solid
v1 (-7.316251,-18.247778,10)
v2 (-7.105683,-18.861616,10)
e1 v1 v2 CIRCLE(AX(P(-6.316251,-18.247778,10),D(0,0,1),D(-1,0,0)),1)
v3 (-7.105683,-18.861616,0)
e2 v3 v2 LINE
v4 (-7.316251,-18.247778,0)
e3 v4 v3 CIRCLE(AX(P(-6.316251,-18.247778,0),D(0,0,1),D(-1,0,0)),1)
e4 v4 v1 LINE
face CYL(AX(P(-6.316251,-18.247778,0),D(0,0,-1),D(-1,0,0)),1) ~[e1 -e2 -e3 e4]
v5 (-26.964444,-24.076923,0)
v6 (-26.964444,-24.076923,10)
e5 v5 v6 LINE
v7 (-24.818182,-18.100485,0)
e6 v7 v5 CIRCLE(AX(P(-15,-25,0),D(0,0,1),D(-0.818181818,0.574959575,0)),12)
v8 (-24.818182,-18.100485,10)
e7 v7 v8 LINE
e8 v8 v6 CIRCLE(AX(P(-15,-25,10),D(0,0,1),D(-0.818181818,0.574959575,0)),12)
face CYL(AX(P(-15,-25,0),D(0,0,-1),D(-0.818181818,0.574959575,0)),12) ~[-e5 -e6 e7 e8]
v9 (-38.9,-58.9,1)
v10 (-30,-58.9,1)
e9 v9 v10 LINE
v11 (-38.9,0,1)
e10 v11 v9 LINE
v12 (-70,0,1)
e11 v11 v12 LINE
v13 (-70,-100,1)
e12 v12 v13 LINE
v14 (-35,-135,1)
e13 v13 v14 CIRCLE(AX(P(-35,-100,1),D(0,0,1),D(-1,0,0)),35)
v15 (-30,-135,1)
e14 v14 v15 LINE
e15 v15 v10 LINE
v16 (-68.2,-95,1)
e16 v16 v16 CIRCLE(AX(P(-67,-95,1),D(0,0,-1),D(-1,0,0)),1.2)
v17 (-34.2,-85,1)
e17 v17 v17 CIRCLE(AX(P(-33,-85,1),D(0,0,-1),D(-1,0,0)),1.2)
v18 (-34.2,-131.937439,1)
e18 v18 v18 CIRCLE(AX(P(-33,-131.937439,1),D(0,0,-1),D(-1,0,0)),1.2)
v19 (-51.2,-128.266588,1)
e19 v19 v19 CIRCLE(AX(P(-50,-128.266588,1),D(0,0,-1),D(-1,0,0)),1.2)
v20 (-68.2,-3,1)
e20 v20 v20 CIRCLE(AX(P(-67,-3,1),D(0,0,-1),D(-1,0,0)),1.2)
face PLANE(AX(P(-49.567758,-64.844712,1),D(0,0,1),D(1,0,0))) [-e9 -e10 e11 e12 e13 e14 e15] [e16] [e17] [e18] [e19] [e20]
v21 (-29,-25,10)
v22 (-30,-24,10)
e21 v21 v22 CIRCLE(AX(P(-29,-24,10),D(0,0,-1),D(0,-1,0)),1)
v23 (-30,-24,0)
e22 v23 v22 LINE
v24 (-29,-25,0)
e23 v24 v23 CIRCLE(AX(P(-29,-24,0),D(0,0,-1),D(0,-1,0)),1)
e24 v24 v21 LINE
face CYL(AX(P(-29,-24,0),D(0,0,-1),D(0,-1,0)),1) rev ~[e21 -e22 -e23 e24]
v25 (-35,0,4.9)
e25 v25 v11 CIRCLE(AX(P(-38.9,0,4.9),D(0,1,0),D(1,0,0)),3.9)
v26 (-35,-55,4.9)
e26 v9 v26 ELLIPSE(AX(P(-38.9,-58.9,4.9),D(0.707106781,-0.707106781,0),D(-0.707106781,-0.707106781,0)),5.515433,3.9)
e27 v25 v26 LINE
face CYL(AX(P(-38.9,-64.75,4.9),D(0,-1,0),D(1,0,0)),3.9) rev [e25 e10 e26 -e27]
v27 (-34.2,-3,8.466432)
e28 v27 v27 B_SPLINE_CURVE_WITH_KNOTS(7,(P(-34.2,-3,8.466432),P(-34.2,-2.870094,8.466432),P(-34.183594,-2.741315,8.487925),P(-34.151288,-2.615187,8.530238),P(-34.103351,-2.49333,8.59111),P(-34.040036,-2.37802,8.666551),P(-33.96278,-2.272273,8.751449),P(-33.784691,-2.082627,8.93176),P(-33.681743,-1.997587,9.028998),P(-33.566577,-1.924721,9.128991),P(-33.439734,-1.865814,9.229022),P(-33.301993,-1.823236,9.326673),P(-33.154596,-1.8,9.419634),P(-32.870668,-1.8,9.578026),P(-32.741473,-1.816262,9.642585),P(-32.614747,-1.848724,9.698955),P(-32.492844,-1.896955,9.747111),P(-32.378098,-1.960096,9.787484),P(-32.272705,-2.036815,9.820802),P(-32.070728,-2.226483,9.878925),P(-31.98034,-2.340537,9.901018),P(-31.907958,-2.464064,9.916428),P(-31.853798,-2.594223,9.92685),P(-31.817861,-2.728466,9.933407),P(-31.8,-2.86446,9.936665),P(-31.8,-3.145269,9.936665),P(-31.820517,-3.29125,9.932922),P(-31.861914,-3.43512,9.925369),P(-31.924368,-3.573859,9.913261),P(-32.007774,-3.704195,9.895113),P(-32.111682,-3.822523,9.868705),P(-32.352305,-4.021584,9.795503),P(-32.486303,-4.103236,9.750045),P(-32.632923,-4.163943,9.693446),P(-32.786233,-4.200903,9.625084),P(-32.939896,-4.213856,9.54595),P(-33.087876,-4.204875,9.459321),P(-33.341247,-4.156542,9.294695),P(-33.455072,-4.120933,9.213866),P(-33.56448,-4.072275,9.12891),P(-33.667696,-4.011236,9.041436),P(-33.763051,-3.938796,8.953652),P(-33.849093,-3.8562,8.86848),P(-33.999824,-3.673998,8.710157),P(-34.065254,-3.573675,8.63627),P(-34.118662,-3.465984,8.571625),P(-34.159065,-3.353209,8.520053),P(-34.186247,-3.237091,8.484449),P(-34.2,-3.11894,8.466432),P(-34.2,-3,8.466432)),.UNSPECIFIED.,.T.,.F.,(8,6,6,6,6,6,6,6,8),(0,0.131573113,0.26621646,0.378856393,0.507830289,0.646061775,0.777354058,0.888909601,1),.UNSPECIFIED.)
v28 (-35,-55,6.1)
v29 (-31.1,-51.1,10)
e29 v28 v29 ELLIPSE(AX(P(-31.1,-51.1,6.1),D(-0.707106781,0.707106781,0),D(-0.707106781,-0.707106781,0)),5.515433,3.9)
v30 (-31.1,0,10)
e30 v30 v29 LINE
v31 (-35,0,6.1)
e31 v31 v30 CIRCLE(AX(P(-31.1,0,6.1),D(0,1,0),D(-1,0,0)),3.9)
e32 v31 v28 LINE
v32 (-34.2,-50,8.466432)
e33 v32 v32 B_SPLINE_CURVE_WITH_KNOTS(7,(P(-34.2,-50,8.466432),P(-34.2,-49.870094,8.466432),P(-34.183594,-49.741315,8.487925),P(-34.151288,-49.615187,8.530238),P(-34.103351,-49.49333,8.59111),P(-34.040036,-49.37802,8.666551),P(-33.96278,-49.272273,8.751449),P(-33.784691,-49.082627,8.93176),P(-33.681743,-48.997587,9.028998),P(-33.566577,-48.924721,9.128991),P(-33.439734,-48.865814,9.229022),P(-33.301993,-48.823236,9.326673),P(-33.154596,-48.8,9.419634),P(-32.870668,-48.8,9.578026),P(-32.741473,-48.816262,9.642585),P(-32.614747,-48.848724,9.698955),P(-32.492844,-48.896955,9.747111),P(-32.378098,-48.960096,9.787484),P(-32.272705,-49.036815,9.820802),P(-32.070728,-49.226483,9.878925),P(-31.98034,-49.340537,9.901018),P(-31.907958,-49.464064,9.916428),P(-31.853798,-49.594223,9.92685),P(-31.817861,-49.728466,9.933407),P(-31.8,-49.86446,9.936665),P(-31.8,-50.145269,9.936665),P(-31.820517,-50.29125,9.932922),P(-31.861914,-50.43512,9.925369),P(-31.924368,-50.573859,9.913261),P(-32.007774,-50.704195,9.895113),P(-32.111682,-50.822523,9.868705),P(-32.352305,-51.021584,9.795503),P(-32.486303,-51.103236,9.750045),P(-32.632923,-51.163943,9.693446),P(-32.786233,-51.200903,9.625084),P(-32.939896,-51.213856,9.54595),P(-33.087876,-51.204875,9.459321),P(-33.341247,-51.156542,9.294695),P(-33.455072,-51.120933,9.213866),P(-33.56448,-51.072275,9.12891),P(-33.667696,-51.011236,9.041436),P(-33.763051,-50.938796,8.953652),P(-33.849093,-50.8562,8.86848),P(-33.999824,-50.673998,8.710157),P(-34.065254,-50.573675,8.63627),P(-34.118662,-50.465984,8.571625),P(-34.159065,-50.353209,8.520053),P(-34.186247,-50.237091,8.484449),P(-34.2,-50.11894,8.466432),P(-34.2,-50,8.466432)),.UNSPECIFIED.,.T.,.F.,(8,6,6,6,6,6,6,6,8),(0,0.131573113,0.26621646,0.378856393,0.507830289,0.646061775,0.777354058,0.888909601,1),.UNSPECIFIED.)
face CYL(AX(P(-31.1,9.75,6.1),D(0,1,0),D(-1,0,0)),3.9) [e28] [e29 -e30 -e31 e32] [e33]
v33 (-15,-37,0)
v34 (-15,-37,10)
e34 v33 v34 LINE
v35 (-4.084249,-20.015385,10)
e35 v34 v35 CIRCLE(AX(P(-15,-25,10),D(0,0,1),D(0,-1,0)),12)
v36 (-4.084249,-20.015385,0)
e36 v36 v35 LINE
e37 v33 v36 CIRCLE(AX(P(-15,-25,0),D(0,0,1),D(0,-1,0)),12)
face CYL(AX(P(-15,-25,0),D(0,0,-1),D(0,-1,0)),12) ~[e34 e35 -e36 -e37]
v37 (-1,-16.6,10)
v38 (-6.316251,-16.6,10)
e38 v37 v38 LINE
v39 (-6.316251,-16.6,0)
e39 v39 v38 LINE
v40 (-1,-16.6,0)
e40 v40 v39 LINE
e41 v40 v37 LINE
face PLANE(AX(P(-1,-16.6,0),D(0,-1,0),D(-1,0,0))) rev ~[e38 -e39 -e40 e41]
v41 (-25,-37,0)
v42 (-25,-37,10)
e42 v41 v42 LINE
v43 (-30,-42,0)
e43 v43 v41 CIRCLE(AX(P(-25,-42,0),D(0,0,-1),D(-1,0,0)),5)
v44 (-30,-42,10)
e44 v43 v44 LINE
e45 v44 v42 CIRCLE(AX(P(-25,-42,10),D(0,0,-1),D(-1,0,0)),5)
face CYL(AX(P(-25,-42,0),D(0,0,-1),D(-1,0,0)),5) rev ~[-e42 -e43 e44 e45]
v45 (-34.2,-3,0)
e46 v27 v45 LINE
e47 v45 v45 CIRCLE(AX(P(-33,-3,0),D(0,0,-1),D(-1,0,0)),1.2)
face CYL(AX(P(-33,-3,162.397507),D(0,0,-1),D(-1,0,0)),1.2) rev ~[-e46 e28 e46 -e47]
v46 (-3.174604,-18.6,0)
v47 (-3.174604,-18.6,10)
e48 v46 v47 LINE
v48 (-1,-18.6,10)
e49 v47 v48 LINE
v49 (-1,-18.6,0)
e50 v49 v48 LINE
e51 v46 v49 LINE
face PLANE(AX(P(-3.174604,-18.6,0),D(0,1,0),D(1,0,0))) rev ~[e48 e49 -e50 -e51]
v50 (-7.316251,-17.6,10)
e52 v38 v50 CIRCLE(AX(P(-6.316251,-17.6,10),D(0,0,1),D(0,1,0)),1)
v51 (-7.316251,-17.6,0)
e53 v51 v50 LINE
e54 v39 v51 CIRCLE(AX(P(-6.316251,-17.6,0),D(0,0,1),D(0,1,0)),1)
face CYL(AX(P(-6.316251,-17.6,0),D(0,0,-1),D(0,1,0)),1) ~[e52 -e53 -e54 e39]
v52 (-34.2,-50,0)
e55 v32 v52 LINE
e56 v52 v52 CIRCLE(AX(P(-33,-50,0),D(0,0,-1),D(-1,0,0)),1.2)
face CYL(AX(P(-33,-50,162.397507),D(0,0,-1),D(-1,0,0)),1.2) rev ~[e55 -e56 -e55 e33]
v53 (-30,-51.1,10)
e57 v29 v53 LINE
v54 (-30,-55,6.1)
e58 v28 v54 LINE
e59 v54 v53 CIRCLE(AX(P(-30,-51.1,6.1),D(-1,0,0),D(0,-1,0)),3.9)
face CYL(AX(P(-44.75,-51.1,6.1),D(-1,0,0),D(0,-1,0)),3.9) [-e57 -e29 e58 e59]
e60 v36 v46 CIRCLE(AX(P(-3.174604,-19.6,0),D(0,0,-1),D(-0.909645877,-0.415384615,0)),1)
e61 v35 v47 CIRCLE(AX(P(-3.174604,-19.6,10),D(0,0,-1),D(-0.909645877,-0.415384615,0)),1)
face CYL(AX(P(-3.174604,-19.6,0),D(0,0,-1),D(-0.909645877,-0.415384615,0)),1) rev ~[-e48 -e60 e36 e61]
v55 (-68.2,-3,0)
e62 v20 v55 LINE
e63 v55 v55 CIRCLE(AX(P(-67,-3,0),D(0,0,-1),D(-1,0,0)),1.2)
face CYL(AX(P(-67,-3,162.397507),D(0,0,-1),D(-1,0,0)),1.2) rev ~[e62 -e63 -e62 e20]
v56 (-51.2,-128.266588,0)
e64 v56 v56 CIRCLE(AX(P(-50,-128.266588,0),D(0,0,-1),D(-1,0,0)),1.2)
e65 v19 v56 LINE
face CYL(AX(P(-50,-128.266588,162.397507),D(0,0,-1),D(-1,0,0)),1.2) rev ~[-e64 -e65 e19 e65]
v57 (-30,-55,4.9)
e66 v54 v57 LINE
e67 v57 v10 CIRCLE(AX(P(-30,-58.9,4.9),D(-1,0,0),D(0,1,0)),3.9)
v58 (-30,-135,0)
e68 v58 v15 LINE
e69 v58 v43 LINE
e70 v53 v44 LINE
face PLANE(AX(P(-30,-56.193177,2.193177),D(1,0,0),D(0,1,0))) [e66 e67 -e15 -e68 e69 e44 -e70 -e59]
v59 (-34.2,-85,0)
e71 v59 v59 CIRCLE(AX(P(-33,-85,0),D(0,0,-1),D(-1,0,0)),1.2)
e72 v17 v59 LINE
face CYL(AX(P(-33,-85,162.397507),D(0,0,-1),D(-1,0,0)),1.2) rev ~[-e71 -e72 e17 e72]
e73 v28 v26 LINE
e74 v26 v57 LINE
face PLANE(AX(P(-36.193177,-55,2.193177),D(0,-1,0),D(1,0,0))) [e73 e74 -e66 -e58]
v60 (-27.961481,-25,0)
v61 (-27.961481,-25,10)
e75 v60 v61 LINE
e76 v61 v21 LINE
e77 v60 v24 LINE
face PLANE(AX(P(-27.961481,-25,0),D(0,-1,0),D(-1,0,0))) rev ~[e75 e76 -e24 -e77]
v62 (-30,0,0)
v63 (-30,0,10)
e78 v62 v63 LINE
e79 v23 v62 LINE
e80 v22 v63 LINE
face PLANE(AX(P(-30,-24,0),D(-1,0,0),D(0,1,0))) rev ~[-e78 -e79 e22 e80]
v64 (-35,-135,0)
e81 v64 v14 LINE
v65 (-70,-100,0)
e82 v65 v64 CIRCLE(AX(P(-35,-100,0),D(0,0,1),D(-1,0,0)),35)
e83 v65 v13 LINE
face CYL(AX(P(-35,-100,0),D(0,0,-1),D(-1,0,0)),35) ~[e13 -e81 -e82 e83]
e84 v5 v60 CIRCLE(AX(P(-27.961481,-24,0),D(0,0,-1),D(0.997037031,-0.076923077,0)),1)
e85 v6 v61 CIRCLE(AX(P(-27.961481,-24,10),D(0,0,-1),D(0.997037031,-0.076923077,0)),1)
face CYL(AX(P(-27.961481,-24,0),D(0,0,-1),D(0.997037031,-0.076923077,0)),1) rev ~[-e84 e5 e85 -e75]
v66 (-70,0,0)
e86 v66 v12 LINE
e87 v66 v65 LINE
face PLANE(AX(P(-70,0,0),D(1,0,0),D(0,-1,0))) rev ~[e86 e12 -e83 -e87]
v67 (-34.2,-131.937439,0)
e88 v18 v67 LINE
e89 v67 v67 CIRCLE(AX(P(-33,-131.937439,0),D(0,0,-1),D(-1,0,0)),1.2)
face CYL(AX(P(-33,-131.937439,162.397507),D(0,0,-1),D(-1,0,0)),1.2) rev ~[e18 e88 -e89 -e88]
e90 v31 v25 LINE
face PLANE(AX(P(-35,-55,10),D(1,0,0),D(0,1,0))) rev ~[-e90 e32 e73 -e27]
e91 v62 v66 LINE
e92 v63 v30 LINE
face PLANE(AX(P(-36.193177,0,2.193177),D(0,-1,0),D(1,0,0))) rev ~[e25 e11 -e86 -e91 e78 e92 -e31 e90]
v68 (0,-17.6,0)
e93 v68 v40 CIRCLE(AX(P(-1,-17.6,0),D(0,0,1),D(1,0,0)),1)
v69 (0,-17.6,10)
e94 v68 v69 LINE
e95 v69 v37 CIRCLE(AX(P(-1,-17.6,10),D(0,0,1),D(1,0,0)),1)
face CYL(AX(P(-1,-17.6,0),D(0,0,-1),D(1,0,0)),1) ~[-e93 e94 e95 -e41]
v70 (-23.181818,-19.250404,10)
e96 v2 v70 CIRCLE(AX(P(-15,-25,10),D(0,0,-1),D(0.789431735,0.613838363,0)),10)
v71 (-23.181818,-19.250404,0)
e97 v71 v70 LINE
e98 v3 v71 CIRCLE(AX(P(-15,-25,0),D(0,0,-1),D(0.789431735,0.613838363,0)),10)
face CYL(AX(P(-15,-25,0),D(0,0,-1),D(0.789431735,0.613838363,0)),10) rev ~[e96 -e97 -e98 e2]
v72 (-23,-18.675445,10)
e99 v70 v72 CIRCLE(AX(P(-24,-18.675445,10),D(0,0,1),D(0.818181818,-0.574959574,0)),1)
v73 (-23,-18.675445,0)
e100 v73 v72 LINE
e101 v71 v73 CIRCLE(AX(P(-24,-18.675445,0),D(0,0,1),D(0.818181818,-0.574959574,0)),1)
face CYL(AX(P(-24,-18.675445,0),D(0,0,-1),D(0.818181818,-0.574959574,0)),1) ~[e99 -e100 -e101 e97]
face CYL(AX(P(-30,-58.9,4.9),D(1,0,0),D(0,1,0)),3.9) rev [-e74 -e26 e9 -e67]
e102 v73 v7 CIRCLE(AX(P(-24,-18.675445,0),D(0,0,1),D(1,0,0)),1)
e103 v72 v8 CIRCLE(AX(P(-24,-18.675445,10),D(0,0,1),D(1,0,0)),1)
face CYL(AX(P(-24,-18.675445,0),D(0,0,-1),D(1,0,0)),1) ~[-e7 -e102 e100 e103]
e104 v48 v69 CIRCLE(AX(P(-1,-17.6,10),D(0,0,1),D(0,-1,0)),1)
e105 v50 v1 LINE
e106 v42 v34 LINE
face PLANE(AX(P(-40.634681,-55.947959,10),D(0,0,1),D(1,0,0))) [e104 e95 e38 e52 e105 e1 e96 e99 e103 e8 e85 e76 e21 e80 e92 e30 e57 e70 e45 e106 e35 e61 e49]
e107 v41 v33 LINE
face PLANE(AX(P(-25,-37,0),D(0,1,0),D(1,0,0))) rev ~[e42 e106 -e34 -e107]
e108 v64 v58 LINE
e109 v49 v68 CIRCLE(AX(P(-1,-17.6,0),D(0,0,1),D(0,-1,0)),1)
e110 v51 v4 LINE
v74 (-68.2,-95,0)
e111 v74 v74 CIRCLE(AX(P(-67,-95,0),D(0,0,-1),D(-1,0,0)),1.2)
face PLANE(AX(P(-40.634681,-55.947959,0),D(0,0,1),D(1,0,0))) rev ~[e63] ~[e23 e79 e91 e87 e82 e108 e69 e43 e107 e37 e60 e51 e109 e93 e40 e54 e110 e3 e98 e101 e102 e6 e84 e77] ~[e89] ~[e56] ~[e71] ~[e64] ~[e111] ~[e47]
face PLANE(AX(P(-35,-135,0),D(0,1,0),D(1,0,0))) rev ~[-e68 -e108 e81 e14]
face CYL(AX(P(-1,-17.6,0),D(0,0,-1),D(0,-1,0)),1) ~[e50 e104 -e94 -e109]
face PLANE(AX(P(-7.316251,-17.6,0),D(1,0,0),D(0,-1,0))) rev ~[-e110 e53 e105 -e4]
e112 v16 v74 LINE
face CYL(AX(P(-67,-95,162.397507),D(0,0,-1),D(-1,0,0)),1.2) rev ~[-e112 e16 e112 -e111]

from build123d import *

# Parameters (mm, degrees)
F1_DEPTH     = 10
F3_DEPTH     = 9
F5_D         = 2.4
F6_T1_DEPTH  = 55
F6_T3_DEPTH  = 5
F6_T9_DEPTH  = 64.75
F6_T13_DEPTH = 14.75
F6_T16_DEPTH = 24.5
F6_T18_DEPTH = 74.5


# Not quite as in the source:
# - a fillet or chamfer that OpenCascade refuses, or shapes differently, is made with other operations: its cross-section is extruded or revolved along the edge and cut away or added
# - a feature names something its author has since deleted; it is built from what else it names


with BuildPart() as f1:
    # F0 (on Top) → F1 (new body)
    with BuildSketch(Plane.XY):
        with BuildLine():
            Line((-30, 0), (-70, 0))
            Line((-70, 0), (-70, -100))
            ThreePointArc((-70, -100), (-59.7487373415, -124.7487373415), (-35, -135))
            Line((-35, -135), (-30, -135))
            Line((-30, -135), (-30, -42))
            ThreePointArc((-30, -42), (-28.5355339059, -38.4644660941), (-25, -37))
            Line((-25, -37), (-15, -37))
            ThreePointArc((-15, -37), (-4.9050660078, -31.4878584828), (-4.0842494776, -20.0153846154))
            ThreePointArc((-4.0842494776, -20.0153846154), (-4.0158481001, -19.0593451264), (-3.1746036007, -18.6))
            Line((-3.1746036007, -18.6), (-1, -18.6))
            ThreePointArc((-1, -18.6), (-0.2928932188, -18.3071067812), (0, -17.6))
            ThreePointArc((0, -17.6), (-0.2928932188, -16.8928932188), (-1, -16.6))
            Line((-1, -16.6), (-6.3162509151, -16.6))
            ThreePointArc((-6.3162509151, -16.6), (-7.0233576963, -16.8928932188), (-7.3162509151, -17.6))
            Line((-7.3162509151, -17.6), (-7.3162509151, -18.2477780079))
            ThreePointArc((-7.3162509151, -18.2477780079), (-7.2621451309, -18.5722531726), (-7.1056826501, -18.8616163708))
            ThreePointArc((-7.1056826501, -18.8616163708), (-14.7582290616, -34.9970769134), (-23.1818181818, -19.2504042542))
            ThreePointArc((-23.1818181818, -19.2504042542), (-23.0465374108, -18.9769560242), (-23, -18.6754446797))
            ThreePointArc((-23, -18.6754446797), (-23.6984886554, -17.7219820904), (-24.8181818182, -18.1004851051))
            ThreePointArc((-24.8181818182, -18.1004851051), (-26.2938104102, -20.9441589751), (-26.9644443663, -24.0769230769))
            ThreePointArc((-26.9644443663, -24.0769230769), (-27.2821151763, -24.7337993857), (-27.9614813968, -25))
            Line((-27.9614813968, -25), (-29, -25))
            ThreePointArc((-29, -25), (-29.7071067812, -24.7071067812), (-30, -24))
            Line((-30, -24), (-30, 0))
        make_face()
    extrude(amount=F1_DEPTH)

    # F2 (on face) → F3 (cut)
    with BuildSketch(Plane.XY.offset(10)):
        with BuildLine():
            Line((-35, -55), (-35, 0))
            Line((-35, 0), (-70, 0))
            Line((-70, 0), (-70, -100))
            ThreePointArc((-70, -100), (-59.7487373415, -124.7487373415), (-35, -135))
            Line((-35, -135), (-30, -135))
            Line((-30, -135), (-30, -55))
            Line((-30, -55), (-35, -55))
        make_face()
    extrude(amount=-F3_DEPTH, mode=Mode.SUBTRACT)

    # F5 (through all)
    with Locations(Plane.XY.offset(10)):
        with Locations((-67, -3), (-50, -128.2665880502), (-33, -131.9374388453), (-33, -85), (-33, -50), (-33, -3), (-67, -95)):
            Hole(F5_D / 2)

    # F6: fillet of radius 3.9 on 4 edges, made by hand

    # F6_s2 → F6_t1 (join)
    with BuildSketch(Plane.XZ):
        with BuildLine():
            ThreePointArc((-35, 4.9), (-36.1422835534, 2.1422835534), (-38.9, 1))
            Line((-38.9, 1), (-35, 1))
            Line((-35, 1), (-35, 4.9))
        make_face()
    extrude(amount=F6_T1_DEPTH)

    # F6_s4 → F6_t3 (join)
    with BuildSketch(Plane.YZ.offset(-35)):
        with BuildLine():
            ThreePointArc((-55, 4.9), (-56.1422835534, 2.1422835534), (-58.9, 1))
            Line((-58.9, 1), (-55, 1))
            Line((-55, 1), (-55, 4.9))
        make_face()
    extrude(amount=F6_T3_DEPTH)


with BuildPart() as f6_tool7:
    # F6_s8 → F6_t9 (new body)
    with BuildSketch(Plane.XZ.offset(64.75)):
        with BuildLine():
            ThreePointArc((-35, 4.9), (-36.1422835534, 2.1422835534), (-38.9, 1))
            Line((-38.9, 1), (-35, 1))
            Line((-35, 1), (-35, 4.9))
        make_face()
    extrude(amount=-F6_T9_DEPTH)

    split(bisect_by=Plane.XZ.offset(55), keep=Keep.TOP)


with BuildPart() as f6_tool11:
    # F6_s12 → F6_t13 (new body)
    with BuildSketch(Plane.YZ.offset(-30)):
        with BuildLine():
            ThreePointArc((-55, 4.9), (-56.1422835534, 2.1422835534), (-58.9, 1))
            Line((-58.9, 1), (-55, 1))
            Line((-55, 1), (-55, 4.9))
        make_face()
    extrude(amount=-F6_T13_DEPTH)

    split(bisect_by=Plane.YZ.offset(-35), keep=Keep.BOTTOM)


with BuildPart() as f6_tool7_1:
    add(f6_tool7.part)

    # F6_t15: intersect F6_tool11
    add(f6_tool11.part, mode=Mode.INTERSECT)


with BuildPart() as f1_1:
    add(f1.part)

    # F6_t5: union F6_tool7
    add(f6_tool7_1.part)

    # F6_s17 → F6_t16 (cut)
    with BuildSketch(Plane.YZ.offset(-44.75)):
        with BuildLine():
            ThreePointArc((-55, 6.1), (-53.8577164466, 8.8577164466), (-51.1, 10))
            Line((-51.1, 10), (-55, 10))
            Line((-55, 10), (-55, 6.1))
        make_face()
    extrude(amount=F6_T16_DEPTH, mode=Mode.SUBTRACT)

    # F6_s19 → F6_t18 (cut)
    with BuildSketch(Plane.XZ.offset(-9.75)):
        with BuildLine():
            ThreePointArc((-35, 6.1), (-33.8577164466, 8.8577164466), (-31.1, 10))
            Line((-31.1, 10), (-35, 10))
            Line((-35, 10), (-35, 6.1))
        make_face()
    extrude(amount=F6_T18_DEPTH, mode=Mode.SUBTRACT)


solid = f1_1.part
